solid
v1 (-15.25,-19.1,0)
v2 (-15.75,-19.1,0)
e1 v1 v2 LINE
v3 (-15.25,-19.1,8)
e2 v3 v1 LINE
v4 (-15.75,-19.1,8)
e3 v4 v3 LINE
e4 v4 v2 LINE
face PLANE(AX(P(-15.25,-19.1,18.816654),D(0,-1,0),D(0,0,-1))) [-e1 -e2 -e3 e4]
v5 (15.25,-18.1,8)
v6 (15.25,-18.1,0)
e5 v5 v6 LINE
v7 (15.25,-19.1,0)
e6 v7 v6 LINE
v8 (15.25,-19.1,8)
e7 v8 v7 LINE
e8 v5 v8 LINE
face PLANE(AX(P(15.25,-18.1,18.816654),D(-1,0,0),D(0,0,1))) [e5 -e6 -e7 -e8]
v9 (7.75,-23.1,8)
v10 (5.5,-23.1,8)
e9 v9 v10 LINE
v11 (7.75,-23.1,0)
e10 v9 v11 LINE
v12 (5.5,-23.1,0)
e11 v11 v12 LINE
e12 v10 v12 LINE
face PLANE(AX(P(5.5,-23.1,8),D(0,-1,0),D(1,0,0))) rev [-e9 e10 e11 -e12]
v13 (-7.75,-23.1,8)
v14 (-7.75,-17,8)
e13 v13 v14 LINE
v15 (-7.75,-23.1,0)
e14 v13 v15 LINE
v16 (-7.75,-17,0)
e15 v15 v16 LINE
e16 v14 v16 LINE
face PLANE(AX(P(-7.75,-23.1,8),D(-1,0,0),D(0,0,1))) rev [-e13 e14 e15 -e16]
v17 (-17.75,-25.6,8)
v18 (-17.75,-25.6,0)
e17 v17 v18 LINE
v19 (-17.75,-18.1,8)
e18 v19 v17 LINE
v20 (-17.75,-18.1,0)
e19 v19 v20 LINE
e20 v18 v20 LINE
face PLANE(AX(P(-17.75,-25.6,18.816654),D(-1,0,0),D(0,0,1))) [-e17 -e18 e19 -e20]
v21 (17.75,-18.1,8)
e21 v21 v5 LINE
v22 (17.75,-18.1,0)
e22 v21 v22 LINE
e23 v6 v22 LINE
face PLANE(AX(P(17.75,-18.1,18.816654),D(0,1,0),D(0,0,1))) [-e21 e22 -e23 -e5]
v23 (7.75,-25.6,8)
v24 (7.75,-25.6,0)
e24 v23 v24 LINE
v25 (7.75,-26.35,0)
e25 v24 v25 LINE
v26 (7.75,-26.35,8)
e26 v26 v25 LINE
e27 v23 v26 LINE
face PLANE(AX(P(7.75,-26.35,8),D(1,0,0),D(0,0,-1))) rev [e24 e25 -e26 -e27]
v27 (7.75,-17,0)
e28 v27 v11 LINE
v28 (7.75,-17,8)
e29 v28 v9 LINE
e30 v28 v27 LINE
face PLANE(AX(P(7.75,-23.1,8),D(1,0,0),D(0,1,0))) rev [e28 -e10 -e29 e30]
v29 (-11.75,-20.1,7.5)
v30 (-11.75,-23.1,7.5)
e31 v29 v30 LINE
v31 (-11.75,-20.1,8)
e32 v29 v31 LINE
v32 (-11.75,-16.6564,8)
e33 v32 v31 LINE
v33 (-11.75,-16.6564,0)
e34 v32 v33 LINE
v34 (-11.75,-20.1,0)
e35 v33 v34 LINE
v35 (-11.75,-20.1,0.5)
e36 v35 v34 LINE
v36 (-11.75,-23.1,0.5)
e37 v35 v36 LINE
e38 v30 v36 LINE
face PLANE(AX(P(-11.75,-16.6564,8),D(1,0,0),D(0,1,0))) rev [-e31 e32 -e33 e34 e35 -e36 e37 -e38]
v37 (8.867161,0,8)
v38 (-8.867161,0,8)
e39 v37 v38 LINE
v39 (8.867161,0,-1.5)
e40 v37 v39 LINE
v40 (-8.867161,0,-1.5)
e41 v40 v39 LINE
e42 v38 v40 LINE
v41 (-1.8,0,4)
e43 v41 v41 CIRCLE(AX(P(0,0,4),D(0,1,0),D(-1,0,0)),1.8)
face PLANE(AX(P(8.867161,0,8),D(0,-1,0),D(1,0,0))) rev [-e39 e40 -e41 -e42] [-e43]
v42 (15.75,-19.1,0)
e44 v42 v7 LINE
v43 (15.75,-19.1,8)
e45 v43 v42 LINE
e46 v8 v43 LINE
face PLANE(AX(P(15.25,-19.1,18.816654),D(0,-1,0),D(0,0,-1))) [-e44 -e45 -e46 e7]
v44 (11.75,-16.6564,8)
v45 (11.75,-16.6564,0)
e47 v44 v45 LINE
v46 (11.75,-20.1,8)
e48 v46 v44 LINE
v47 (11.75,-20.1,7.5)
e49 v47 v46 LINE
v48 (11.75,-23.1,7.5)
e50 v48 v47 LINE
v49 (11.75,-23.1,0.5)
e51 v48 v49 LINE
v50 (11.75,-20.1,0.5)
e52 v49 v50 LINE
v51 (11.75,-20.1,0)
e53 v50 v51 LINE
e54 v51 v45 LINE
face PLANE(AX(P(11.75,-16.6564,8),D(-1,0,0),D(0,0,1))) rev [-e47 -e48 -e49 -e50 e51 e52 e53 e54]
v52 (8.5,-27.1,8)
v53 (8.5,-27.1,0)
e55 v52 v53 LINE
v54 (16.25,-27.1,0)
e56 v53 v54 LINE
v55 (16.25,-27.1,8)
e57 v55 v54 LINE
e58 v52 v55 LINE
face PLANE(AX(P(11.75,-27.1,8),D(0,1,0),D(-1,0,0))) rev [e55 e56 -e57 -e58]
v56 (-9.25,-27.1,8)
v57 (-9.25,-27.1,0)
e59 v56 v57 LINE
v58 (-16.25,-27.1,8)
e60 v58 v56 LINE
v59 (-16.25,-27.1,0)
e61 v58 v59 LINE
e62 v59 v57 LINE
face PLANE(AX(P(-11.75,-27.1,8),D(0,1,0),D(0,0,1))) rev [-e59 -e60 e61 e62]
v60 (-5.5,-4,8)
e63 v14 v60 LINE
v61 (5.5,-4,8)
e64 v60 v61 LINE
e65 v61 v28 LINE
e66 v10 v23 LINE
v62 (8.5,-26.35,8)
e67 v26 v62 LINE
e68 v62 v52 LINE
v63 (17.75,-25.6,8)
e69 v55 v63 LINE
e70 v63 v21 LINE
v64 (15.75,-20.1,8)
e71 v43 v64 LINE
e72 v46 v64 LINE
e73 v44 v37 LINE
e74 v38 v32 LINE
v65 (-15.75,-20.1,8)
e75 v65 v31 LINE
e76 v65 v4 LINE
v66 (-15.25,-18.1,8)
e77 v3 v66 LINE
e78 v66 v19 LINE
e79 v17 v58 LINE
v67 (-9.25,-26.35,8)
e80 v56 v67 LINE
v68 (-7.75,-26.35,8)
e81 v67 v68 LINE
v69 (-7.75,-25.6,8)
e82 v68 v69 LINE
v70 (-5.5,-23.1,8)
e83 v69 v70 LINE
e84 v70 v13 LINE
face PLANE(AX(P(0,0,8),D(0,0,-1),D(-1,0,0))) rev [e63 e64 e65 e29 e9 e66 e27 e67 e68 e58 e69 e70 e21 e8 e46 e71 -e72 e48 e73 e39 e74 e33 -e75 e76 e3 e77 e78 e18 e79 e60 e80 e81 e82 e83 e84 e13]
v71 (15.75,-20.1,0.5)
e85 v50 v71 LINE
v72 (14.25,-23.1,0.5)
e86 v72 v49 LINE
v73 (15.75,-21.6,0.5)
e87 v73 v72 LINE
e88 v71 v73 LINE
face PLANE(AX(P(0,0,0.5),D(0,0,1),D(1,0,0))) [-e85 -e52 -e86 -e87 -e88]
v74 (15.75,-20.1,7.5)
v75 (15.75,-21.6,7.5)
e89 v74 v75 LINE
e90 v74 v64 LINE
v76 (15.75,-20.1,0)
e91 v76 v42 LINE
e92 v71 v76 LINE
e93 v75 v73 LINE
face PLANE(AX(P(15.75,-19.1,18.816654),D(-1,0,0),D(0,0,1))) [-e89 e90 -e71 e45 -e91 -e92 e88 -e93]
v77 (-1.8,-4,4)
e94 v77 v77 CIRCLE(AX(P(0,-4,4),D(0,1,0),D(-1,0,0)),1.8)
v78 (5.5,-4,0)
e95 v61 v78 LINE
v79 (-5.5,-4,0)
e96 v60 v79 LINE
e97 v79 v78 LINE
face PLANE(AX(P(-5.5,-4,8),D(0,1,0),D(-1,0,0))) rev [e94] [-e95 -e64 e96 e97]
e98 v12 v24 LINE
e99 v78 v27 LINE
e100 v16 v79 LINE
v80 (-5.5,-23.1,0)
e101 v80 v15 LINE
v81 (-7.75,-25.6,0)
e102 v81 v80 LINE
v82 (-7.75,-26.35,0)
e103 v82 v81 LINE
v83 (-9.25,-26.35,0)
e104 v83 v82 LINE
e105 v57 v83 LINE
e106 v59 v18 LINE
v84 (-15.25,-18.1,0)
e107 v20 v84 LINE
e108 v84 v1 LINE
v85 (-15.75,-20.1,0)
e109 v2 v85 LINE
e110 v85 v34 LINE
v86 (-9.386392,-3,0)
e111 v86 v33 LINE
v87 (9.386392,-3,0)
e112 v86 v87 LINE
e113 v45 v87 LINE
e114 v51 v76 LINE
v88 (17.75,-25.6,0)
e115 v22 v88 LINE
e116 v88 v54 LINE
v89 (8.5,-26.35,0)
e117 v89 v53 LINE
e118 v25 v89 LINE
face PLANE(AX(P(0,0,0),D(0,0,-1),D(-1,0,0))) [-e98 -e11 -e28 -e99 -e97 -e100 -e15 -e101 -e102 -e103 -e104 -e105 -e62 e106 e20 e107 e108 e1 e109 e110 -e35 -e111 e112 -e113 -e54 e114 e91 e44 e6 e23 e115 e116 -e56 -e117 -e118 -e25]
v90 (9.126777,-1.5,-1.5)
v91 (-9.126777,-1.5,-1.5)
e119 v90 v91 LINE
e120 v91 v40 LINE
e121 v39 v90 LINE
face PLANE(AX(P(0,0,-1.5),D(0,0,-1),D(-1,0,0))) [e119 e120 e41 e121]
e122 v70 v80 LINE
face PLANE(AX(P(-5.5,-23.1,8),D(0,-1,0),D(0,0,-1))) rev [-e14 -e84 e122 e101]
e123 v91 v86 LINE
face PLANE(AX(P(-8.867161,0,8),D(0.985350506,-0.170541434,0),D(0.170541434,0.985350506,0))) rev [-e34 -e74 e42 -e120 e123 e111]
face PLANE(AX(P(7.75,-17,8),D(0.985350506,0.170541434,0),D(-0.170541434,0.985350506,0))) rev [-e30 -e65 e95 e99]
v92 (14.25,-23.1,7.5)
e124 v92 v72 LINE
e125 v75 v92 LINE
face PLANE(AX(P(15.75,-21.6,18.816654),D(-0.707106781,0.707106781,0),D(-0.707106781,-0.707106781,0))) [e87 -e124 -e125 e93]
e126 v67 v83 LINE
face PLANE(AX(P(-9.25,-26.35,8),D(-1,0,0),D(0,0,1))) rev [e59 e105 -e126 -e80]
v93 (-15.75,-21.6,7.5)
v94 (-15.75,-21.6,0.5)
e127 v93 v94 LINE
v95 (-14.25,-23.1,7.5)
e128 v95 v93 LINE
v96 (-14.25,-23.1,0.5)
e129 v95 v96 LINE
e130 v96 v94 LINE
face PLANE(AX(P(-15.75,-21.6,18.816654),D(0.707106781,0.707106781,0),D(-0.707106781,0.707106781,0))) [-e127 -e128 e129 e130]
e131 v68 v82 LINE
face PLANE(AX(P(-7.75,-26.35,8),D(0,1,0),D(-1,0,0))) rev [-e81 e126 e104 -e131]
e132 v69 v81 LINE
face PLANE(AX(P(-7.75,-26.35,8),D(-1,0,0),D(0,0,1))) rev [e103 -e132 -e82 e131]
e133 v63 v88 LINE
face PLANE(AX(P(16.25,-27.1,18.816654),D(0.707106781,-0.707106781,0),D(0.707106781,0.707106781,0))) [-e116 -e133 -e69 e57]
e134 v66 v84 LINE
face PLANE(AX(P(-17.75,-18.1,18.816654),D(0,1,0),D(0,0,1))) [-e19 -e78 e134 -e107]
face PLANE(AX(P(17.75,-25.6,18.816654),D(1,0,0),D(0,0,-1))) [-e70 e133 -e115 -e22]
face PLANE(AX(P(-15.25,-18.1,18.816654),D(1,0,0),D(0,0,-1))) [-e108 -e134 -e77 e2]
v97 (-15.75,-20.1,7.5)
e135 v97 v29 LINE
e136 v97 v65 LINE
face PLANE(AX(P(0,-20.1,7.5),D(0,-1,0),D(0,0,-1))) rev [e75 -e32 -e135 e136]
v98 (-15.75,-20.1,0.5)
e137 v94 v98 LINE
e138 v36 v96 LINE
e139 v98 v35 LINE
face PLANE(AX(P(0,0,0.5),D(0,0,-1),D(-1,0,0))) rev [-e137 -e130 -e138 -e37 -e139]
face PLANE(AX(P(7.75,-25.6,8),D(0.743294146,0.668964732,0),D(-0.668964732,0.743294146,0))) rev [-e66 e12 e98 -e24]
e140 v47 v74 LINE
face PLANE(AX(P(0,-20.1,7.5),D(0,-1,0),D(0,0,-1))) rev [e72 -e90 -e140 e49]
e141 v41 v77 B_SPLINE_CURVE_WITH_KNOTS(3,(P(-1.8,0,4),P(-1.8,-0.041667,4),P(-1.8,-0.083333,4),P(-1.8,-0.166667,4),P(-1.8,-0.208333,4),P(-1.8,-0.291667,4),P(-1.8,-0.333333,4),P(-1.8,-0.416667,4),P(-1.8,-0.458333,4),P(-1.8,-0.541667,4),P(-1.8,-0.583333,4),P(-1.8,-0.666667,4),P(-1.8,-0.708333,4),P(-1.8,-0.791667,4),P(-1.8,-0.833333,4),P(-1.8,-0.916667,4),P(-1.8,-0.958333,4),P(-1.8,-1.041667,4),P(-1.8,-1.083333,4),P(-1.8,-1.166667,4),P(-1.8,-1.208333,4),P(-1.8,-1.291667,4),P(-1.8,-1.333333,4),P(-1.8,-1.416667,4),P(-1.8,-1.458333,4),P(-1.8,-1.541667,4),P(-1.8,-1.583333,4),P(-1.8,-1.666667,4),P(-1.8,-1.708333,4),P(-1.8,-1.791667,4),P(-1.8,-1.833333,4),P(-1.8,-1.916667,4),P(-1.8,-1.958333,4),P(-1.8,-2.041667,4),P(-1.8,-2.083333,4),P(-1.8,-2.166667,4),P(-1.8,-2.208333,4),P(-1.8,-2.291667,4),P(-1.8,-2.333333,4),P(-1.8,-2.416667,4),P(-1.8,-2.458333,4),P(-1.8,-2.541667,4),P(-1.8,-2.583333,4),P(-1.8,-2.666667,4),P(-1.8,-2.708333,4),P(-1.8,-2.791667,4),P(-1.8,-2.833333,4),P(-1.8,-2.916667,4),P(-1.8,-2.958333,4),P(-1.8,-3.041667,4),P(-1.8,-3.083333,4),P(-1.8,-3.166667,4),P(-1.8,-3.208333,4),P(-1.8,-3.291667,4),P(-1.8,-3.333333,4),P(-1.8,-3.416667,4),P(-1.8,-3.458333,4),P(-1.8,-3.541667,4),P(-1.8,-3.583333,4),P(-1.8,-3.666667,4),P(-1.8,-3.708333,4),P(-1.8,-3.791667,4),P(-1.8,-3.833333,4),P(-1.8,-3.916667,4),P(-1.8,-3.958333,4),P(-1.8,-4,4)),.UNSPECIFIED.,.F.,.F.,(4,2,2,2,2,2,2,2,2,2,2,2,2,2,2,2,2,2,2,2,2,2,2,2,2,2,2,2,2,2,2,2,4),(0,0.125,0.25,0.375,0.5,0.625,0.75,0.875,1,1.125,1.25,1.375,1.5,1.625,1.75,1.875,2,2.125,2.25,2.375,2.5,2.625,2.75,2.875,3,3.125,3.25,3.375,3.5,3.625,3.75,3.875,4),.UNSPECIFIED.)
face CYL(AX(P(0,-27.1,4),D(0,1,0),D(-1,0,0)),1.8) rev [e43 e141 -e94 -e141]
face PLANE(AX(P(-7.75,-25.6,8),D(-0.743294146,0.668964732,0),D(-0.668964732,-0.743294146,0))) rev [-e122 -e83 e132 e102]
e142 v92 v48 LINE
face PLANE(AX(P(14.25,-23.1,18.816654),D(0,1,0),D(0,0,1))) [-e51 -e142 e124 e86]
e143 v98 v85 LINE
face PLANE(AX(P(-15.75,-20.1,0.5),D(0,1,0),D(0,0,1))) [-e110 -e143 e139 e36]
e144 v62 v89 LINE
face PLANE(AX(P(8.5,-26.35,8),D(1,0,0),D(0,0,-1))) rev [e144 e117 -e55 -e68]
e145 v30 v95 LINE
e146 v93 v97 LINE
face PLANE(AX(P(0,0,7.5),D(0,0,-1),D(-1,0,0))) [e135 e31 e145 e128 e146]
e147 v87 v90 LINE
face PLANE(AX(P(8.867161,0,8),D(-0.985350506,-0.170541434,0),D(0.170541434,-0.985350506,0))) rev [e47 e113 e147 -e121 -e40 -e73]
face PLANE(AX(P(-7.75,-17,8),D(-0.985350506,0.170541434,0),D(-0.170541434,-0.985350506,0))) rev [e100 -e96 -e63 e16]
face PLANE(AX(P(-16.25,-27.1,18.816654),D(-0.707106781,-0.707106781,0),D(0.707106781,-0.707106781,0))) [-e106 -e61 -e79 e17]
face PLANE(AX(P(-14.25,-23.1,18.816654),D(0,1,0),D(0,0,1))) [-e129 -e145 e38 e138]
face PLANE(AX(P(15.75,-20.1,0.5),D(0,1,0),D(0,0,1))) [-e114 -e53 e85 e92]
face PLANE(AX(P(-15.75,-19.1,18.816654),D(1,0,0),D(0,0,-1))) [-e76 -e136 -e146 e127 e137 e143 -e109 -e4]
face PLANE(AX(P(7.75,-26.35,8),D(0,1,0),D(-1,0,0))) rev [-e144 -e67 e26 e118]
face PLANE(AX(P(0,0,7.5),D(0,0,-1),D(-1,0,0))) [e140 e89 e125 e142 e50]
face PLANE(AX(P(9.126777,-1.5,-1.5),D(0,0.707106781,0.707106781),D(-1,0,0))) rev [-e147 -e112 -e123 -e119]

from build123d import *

# Parameters (mm, degrees)
BOSS_EXTRUDE1_DEPTH = 8
SKETCH2_R           = 1.8
CUT_EXTRUDE1_DEPTH  = 31.60183818
BOSS_EXTRUDE4_DEPTH = 8
BOSS_EXTRUDE5_DEPTH = 0.5
BOSS_EXTRUDE6_START = -8
BOSS_EXTRUDE6_DEPTH = 0.5
BOSS_EXTRUDE3_DEPTH = 1.5
CHAMFER3_SIZE       = 1.5


with BuildPart() as part:
    # Sketch1 → Boss-Extrude1 (new body)
    with BuildSketch(Plane.XY):
        Polygon((8.867161478, 0), (-8.867161478, 0), (-11.75, -16.656400352), (-11.75, -27.1), (-9.25, -27.1), (-9.25, -26.35), (-7.75, -26.35), (-7.75, -25.6), (-5.5, -23.1), (-7.75, -23.1), (-7.75, -17), (-5.5, -4), (5.5, -4), (7.75, -17), (7.75, -23.1), (5.5, -23.1), (7.75, -25.6), (7.75, -26.35), (8.5, -26.35), (8.5, -27.1), (11.75, -27.1), (11.75, -16.656400352), align=None)
    extrude(amount=BOSS_EXTRUDE1_DEPTH)

    # Sketch2 → Cut-Extrude1 (cut, through all)
    with BuildSketch(Plane(origin=(0, 0, 0), x_dir=(1, 0, 0), z_dir=(0, 1, 0))):
        with Locations(Location((0, -4, 0), (0, 0, 180))):
            Circle(SKETCH2_R)
    extrude(amount=-CUT_EXTRUDE1_DEPTH, mode=Mode.SUBTRACT)

    # Sketch7 → Boss-Extrude4 (add)
    with BuildSketch(Plane(origin=(0, 0, 0), x_dir=(-1, 0, 0), z_dir=(0, 0, -1))):
        Polygon((-11.75, -27.1), (-16.25, -27.1), (-17.75, -25.6), (-17.75, -18.1), (-15.25, -18.1), (-15.25, -19.1), (-15.75, -19.1), (-15.75, -21.6), (-14.25, -23.1), (-11.75, -23.1), align=None)
        Polygon((16.25, -27.1), (17.75, -25.6), (17.75, -18.1), (15.25, -18.1), (15.25, -19.1), (15.75, -19.1), (15.75, -21.6), (14.25, -23.1), (11.75, -23.1), (11.75, -27.1), align=None)
    extrude(amount=-BOSS_EXTRUDE4_DEPTH)

    # Sketch8 → Boss-Extrude5 (add)
    with BuildSketch(Plane(origin=(0, 0, 0), x_dir=(-1, 0, 0), z_dir=(0, 0, -1))):
        Polygon((-11.75, -23.1), (-11.75, -20.1), (-15.75, -20.1), (-15.75, -21.6), (-14.25, -23.1), align=None)
        Polygon((15.75, -20.1), (11.75, -20.1), (11.75, -23.1), (14.25, -23.1), (15.75, -21.6), align=None)
    extrude(amount=-BOSS_EXTRUDE5_DEPTH)

    # Sketch8<2> → Boss-Extrude6 (add)
    with BuildSketch(Plane(origin=(0, 0, 0), x_dir=(-1, 0, 0), z_dir=(0, 0, -1)).offset(BOSS_EXTRUDE6_START)):
        Polygon((-11.75, -23.1), (-11.75, -20.1), (-15.75, -20.1), (-15.75, -21.6), (-14.25, -23.1), align=None)
        Polygon((15.75, -20.1), (11.75, -20.1), (11.75, -23.1), (14.25, -23.1), (15.75, -21.6), align=None)
    extrude(amount=BOSS_EXTRUDE6_DEPTH)

    # Sketch5 → Boss-Extrude3 (add)
    with BuildSketch(Plane(origin=(0, 0, 0), x_dir=(-1, 0, 0), z_dir=(0, 0, -1))):
        Polygon((8.867161478, 0), (-8.867161478, 0), (-9.126776862, -1.5), (9.126776862, -1.5), align=None)
    extrude(amount=BOSS_EXTRUDE3_DEPTH)

    # Chamfer3
    # the kernel refuses this chamfer: 1.5 mm, written as the material it adds along each edge
    with BuildSketch(Plane(origin=(12.984301344, -1.5, 0), x_dir=(0, -0.9996219169112969, 0.02749587661058638), z_dir=(-1, 0, 0))) as chamfer3_piece_1_section:
        Polygon((CHAMFER3_SIZE * 0.999621916911, -CHAMFER3_SIZE * 0.0274958766106), (-CHAMFER3_SIZE * 0.0274958766106, -CHAMFER3_SIZE * 0.999621916911), (0, 0), align=None)
    chamfer3_piece_1 = extrude(amount=25.968602688, mode=Mode.PRIVATE)
    chamfer3_piece_1 = split(chamfer3_piece_1, bisect_by=Plane(origin=(-8.945746351, -0.454045937, -0.498825905), z_dir=(0.9853505058554479, -0.17054143370575114, 0)), keep=Keep.TOP, mode=Mode.PRIVATE)
    chamfer3_piece_1 = split(chamfer3_piece_1, bisect_by=Plane(origin=(8.945746351, -0.454045937, -0.498825905), z_dir=(-0.9853505058554478, -0.17054143370575137, 0)), keep=Keep.TOP, mode=Mode.PRIVATE)
    add(chamfer3_piece_1)
    # the kernel refuses this chamfer: 1.5 mm, written as the material it takes off along each edge


solid = part.part
